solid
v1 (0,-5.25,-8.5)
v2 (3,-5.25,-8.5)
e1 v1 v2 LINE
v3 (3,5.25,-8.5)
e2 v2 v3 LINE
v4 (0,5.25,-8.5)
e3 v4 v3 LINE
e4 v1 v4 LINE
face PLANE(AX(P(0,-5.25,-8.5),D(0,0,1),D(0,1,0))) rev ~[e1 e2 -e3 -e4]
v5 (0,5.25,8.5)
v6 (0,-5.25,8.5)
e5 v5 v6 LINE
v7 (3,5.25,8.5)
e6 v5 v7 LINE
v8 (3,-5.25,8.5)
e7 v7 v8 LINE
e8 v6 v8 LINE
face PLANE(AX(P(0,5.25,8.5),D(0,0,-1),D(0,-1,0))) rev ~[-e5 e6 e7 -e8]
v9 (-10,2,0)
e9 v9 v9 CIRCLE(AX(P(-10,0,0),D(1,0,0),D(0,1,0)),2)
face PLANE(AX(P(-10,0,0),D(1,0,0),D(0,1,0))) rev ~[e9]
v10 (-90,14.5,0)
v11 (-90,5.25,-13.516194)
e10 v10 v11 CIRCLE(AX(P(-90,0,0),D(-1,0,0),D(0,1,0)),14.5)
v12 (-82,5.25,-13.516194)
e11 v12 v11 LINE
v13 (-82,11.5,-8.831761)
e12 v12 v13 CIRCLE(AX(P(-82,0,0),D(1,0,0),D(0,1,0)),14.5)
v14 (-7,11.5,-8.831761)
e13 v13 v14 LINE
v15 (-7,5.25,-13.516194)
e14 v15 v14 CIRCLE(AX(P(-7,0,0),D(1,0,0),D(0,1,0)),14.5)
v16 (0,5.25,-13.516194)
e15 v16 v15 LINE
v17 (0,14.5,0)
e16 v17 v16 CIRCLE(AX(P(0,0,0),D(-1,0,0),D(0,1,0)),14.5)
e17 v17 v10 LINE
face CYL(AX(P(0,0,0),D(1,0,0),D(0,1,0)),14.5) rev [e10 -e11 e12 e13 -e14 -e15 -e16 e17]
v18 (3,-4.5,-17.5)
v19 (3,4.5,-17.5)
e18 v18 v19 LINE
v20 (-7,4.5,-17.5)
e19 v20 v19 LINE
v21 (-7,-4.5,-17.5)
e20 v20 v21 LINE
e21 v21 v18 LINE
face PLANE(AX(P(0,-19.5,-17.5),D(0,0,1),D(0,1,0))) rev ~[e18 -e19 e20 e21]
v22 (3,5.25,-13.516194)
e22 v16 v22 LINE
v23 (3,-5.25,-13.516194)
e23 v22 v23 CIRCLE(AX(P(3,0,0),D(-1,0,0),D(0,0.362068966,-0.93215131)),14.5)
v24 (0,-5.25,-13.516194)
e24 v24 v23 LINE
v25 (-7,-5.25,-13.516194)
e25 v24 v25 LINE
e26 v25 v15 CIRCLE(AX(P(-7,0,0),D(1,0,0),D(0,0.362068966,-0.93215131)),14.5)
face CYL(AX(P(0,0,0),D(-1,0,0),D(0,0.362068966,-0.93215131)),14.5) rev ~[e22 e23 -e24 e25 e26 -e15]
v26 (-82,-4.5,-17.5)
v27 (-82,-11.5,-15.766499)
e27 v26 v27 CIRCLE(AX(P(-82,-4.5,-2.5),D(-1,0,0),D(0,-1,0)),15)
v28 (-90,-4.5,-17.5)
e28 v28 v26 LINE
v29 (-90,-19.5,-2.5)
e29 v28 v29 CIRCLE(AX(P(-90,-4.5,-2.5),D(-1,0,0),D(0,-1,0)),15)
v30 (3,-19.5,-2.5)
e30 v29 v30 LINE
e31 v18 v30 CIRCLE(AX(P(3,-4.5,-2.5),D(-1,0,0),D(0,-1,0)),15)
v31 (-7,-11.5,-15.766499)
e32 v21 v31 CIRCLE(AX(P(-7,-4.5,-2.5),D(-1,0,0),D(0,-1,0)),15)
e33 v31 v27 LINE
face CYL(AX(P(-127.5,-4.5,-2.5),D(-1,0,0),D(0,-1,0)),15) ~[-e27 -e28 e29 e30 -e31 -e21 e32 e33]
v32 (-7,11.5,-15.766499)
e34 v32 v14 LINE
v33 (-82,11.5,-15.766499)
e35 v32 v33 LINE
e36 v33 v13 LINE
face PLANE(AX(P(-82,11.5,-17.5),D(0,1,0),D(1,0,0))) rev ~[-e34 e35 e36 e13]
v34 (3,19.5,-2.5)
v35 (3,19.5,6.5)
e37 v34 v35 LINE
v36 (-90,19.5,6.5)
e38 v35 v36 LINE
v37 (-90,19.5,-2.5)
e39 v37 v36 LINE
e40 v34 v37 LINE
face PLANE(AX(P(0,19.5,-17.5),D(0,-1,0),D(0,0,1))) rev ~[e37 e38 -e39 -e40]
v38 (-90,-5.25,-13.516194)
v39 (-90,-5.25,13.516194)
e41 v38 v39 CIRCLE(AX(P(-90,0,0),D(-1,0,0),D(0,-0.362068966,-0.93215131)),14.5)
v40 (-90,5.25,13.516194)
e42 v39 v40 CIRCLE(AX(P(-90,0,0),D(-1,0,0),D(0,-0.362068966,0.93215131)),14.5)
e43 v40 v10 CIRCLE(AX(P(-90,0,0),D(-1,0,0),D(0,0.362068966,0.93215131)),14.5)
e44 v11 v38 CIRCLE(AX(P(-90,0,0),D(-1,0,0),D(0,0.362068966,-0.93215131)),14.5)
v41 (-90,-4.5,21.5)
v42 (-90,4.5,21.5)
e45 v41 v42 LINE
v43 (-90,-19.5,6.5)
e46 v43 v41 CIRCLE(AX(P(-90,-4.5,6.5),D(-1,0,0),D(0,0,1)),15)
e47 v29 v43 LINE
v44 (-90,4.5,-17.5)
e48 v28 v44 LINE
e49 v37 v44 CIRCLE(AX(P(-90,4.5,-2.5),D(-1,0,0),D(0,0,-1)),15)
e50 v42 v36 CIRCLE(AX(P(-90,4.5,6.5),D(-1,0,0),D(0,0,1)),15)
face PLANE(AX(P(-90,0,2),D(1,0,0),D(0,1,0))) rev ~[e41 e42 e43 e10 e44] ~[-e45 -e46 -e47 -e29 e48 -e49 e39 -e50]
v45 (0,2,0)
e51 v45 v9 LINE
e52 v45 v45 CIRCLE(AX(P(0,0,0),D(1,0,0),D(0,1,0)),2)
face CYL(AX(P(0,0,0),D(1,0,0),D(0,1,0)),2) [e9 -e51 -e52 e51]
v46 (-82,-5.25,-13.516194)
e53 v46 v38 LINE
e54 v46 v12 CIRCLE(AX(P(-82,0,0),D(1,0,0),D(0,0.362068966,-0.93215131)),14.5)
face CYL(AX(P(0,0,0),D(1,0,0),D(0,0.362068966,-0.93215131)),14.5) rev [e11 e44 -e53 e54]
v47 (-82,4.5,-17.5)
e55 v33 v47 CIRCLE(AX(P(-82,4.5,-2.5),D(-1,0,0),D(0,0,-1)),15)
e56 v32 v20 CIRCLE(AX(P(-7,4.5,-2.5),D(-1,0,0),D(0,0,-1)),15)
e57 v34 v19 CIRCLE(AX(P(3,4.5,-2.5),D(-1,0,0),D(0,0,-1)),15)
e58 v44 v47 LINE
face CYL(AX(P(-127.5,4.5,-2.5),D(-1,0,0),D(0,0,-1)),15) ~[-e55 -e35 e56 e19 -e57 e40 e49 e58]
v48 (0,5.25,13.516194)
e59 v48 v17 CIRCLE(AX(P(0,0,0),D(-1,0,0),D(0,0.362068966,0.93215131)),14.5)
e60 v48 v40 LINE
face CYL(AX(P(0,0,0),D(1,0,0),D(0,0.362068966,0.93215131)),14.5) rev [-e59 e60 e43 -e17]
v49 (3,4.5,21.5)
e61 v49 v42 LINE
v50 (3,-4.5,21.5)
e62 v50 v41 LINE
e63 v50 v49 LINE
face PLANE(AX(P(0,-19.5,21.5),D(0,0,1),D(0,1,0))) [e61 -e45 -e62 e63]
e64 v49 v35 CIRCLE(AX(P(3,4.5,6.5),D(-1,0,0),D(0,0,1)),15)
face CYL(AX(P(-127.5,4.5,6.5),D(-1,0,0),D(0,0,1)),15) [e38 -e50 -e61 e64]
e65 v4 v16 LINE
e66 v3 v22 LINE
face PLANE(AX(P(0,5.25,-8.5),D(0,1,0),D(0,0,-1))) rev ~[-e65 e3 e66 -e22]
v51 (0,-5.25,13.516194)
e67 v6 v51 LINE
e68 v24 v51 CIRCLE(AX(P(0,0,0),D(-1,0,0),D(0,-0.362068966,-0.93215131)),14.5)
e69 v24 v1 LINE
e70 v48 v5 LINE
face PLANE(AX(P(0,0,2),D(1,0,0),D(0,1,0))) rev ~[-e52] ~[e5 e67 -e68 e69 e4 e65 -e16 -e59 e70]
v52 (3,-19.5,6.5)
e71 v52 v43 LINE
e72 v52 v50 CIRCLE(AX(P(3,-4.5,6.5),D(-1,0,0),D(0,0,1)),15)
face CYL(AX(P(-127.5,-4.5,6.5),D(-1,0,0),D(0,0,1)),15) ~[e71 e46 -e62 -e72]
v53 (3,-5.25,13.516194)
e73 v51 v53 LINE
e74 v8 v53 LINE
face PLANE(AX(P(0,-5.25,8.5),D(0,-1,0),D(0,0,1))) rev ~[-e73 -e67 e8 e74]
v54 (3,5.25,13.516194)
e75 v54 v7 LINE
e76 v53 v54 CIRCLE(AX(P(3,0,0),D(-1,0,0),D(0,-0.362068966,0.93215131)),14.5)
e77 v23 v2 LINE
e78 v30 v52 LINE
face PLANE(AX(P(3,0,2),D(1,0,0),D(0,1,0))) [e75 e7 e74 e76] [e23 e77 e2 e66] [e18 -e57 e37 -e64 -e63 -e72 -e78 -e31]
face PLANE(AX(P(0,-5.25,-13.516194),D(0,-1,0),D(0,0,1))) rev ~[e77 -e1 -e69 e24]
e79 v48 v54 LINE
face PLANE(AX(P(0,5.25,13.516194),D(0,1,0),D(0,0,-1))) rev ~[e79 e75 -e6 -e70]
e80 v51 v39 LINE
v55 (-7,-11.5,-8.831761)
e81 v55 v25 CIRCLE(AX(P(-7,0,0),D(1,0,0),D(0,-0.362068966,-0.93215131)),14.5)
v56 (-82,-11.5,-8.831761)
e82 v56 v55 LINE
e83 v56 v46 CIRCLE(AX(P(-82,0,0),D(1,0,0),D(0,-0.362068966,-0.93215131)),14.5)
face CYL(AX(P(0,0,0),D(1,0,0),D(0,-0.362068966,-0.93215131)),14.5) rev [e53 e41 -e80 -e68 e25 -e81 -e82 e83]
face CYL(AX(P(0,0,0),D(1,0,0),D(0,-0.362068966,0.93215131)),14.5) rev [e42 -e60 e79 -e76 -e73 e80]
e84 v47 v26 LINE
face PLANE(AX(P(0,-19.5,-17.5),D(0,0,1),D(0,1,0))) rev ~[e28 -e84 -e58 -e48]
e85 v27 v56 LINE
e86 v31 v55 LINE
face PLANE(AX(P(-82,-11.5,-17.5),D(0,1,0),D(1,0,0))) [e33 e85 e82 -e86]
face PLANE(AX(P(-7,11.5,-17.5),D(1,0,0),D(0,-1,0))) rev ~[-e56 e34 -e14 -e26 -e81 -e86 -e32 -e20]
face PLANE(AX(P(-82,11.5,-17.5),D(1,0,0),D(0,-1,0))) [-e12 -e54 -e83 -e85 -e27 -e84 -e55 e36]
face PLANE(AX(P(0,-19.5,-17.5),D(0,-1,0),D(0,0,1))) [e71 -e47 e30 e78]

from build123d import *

# Parameters (mm, degrees)
F0_W        = 39
F0_H        = 39
F0_R        = 16.5
F1_DEPTH    = 90
F0_R_2      = 2
F2_DEPTH    = 3
F3_W        = 75
F3_H        = 23
F4_DEPTH    = 21.5
F5_DEPTH    = 10
F6_T1_DEPTH = 127.5
F6_T3_DEPTH = 40.5


# Not quite as in the source:
# - a fillet or chamfer that OpenCascade refuses, or shapes differently, is made with other operations: its cross-section is extruded or revolved along the edge and cut away or added
# - a feature names something its author has since deleted; it is built from what else it names


with BuildPart() as f1:
    # F0 (on Right) → F1 (new body)
    with BuildSketch(Plane.YZ):
        with Locations((0, 2)):
            Rectangle(F0_W, F0_H)
        Circle(F0_R, mode=Mode.SUBTRACT)
        Circle(F0_R)
        with BuildLine():
            ThreePointArc((5.25, 13.5161939909), (11.9660979438, 8.1891696771), (14.5, 0))
            ThreePointArc((14.5, 0), (11.9660979438, -8.1891696771), (5.25, -13.5161939909))
            ThreePointArc((5.25, -13.5161939909), (0, -14.5), (-5.25, -13.5161939909))
            ThreePointArc((-5.25, -13.5161939909), (-14.5, 0), (-5.25, 13.5161939909))
            ThreePointArc((-5.25, 13.5161939909), (0, 14.5), (5.25, 13.5161939909))
        make_face(mode=Mode.SUBTRACT)
    extrude(amount=-F1_DEPTH)

    # F0 (on Right) → F2 (join)
    with BuildSketch(Plane.YZ):
        with Locations((0, 2)):
            Rectangle(F0_W, F0_H)
        Circle(F0_R, mode=Mode.SUBTRACT)
        Circle(F0_R)
        with BuildLine():
            ThreePointArc((5.25, 13.5161939909), (11.9660979438, 8.1891696771), (14.5, 0))
            ThreePointArc((14.5, 0), (11.9660979438, -8.1891696771), (5.25, -13.5161939909))
            ThreePointArc((5.25, -13.5161939909), (0, -14.5), (-5.25, -13.5161939909))
            ThreePointArc((-5.25, -13.5161939909), (-14.5, 0), (-5.25, 13.5161939909))
            ThreePointArc((-5.25, 13.5161939909), (0, 14.5), (5.25, 13.5161939909))
        make_face(mode=Mode.SUBTRACT)
        with BuildLine():
            ThreePointArc((5.25, -13.5161939909), (11.9660979438, -8.1891696771), (14.5, 0))
            ThreePointArc((14.5, 0), (11.9660979438, 8.1891696771), (5.25, 13.5161939909))
            Line((5.25, 13.5161939909), (5.25, 8.5))
            Line((5.25, 8.5), (-5.25, 8.5))
            Line((-5.25, 8.5), (-5.25, 13.5161939909))
            ThreePointArc((-5.25, 13.5161939909), (-14.5, 0), (-5.25, -13.5161939909))
            Line((-5.25, -13.5161939909), (-5.25, -8.5))
            Line((-5.25, -8.5), (5.25, -8.5))
            Line((5.25, -8.5), (5.25, -13.5161939909))
        make_face()
        Circle(F0_R_2, mode=Mode.SUBTRACT)
        Circle(F0_R_2)
    extrude(amount=F2_DEPTH)

    # F3 (on face) → F4 (cut)
    with BuildSketch(Plane(origin=(0, 0, -17.5), x_dir=(1, 0, 0), z_dir=(0, 0, -1))):
        with Locations((-44.5, 0)):
            Rectangle(F3_W, F3_H)
    extrude(amount=-F4_DEPTH, mode=Mode.SUBTRACT)

    # F0 (on Right) → F5 (join)
    with BuildSketch(Plane.YZ):
        Circle(F0_R_2)
    extrude(amount=-F5_DEPTH)

    # F6: fillet of radius 15 on 8 edges, made by hand

    # F6_s2 → F6_t1 (cut)
    with BuildSketch(Plane.YZ.offset(-127.5)):
        with BuildLine():
            ThreePointArc((4.5, -17.5), (15.1066017178, -13.1066017178), (19.5, -2.5))
            Line((19.5, -2.5), (19.5, -17.5))
            Line((19.5, -17.5), (4.5, -17.5))
        make_face()
        with BuildLine():
            ThreePointArc((-19.5, -2.5), (-15.1066017178, -13.1066017178), (-4.5, -17.5))
            Line((-4.5, -17.5), (-19.5, -17.5))
            Line((-19.5, -17.5), (-19.5, -2.5))
        make_face()
        with BuildLine():
            ThreePointArc((4.5, 21.5), (15.1066017178, 17.1066017178), (19.5, 6.5))
            Line((19.5, 6.5), (19.5, 21.5))
            Line((19.5, 21.5), (4.5, 21.5))
        make_face()
        with BuildLine():
            ThreePointArc((-4.5, 21.5), (-15.1066017178, 17.1066017178), (-19.5, 6.5))
            Line((-19.5, 6.5), (-19.5, 21.5))
            Line((-19.5, 21.5), (-4.5, 21.5))
        make_face()
    extrude(amount=F6_T1_DEPTH, mode=Mode.SUBTRACT)

    # F6_s4 → F6_t3 (cut)
    with BuildSketch(Plane.YZ):
        with BuildLine():
            ThreePointArc((4.5, -17.5), (15.1066017178, -13.1066017178), (19.5, -2.5))
            Line((19.5, -2.5), (19.5, -17.5))
            Line((19.5, -17.5), (4.5, -17.5))
        make_face()
        with BuildLine():
            ThreePointArc((-19.5, -2.5), (-15.1066017178, -13.1066017178), (-4.5, -17.5))
            Line((-4.5, -17.5), (-19.5, -17.5))
            Line((-19.5, -17.5), (-19.5, -2.5))
        make_face()
        with BuildLine():
            ThreePointArc((4.5, 21.5), (15.1066017178, 17.1066017178), (19.5, 6.5))
            Line((19.5, 6.5), (19.5, 21.5))
            Line((19.5, 21.5), (4.5, 21.5))
        make_face()
        with BuildLine():
            ThreePointArc((-4.5, 21.5), (-15.1066017178, 17.1066017178), (-19.5, 6.5))
            Line((-19.5, 6.5), (-19.5, 21.5))
            Line((-19.5, 21.5), (-4.5, 21.5))
        make_face()
    extrude(amount=F6_T3_DEPTH, mode=Mode.SUBTRACT)


solid = f1.part
